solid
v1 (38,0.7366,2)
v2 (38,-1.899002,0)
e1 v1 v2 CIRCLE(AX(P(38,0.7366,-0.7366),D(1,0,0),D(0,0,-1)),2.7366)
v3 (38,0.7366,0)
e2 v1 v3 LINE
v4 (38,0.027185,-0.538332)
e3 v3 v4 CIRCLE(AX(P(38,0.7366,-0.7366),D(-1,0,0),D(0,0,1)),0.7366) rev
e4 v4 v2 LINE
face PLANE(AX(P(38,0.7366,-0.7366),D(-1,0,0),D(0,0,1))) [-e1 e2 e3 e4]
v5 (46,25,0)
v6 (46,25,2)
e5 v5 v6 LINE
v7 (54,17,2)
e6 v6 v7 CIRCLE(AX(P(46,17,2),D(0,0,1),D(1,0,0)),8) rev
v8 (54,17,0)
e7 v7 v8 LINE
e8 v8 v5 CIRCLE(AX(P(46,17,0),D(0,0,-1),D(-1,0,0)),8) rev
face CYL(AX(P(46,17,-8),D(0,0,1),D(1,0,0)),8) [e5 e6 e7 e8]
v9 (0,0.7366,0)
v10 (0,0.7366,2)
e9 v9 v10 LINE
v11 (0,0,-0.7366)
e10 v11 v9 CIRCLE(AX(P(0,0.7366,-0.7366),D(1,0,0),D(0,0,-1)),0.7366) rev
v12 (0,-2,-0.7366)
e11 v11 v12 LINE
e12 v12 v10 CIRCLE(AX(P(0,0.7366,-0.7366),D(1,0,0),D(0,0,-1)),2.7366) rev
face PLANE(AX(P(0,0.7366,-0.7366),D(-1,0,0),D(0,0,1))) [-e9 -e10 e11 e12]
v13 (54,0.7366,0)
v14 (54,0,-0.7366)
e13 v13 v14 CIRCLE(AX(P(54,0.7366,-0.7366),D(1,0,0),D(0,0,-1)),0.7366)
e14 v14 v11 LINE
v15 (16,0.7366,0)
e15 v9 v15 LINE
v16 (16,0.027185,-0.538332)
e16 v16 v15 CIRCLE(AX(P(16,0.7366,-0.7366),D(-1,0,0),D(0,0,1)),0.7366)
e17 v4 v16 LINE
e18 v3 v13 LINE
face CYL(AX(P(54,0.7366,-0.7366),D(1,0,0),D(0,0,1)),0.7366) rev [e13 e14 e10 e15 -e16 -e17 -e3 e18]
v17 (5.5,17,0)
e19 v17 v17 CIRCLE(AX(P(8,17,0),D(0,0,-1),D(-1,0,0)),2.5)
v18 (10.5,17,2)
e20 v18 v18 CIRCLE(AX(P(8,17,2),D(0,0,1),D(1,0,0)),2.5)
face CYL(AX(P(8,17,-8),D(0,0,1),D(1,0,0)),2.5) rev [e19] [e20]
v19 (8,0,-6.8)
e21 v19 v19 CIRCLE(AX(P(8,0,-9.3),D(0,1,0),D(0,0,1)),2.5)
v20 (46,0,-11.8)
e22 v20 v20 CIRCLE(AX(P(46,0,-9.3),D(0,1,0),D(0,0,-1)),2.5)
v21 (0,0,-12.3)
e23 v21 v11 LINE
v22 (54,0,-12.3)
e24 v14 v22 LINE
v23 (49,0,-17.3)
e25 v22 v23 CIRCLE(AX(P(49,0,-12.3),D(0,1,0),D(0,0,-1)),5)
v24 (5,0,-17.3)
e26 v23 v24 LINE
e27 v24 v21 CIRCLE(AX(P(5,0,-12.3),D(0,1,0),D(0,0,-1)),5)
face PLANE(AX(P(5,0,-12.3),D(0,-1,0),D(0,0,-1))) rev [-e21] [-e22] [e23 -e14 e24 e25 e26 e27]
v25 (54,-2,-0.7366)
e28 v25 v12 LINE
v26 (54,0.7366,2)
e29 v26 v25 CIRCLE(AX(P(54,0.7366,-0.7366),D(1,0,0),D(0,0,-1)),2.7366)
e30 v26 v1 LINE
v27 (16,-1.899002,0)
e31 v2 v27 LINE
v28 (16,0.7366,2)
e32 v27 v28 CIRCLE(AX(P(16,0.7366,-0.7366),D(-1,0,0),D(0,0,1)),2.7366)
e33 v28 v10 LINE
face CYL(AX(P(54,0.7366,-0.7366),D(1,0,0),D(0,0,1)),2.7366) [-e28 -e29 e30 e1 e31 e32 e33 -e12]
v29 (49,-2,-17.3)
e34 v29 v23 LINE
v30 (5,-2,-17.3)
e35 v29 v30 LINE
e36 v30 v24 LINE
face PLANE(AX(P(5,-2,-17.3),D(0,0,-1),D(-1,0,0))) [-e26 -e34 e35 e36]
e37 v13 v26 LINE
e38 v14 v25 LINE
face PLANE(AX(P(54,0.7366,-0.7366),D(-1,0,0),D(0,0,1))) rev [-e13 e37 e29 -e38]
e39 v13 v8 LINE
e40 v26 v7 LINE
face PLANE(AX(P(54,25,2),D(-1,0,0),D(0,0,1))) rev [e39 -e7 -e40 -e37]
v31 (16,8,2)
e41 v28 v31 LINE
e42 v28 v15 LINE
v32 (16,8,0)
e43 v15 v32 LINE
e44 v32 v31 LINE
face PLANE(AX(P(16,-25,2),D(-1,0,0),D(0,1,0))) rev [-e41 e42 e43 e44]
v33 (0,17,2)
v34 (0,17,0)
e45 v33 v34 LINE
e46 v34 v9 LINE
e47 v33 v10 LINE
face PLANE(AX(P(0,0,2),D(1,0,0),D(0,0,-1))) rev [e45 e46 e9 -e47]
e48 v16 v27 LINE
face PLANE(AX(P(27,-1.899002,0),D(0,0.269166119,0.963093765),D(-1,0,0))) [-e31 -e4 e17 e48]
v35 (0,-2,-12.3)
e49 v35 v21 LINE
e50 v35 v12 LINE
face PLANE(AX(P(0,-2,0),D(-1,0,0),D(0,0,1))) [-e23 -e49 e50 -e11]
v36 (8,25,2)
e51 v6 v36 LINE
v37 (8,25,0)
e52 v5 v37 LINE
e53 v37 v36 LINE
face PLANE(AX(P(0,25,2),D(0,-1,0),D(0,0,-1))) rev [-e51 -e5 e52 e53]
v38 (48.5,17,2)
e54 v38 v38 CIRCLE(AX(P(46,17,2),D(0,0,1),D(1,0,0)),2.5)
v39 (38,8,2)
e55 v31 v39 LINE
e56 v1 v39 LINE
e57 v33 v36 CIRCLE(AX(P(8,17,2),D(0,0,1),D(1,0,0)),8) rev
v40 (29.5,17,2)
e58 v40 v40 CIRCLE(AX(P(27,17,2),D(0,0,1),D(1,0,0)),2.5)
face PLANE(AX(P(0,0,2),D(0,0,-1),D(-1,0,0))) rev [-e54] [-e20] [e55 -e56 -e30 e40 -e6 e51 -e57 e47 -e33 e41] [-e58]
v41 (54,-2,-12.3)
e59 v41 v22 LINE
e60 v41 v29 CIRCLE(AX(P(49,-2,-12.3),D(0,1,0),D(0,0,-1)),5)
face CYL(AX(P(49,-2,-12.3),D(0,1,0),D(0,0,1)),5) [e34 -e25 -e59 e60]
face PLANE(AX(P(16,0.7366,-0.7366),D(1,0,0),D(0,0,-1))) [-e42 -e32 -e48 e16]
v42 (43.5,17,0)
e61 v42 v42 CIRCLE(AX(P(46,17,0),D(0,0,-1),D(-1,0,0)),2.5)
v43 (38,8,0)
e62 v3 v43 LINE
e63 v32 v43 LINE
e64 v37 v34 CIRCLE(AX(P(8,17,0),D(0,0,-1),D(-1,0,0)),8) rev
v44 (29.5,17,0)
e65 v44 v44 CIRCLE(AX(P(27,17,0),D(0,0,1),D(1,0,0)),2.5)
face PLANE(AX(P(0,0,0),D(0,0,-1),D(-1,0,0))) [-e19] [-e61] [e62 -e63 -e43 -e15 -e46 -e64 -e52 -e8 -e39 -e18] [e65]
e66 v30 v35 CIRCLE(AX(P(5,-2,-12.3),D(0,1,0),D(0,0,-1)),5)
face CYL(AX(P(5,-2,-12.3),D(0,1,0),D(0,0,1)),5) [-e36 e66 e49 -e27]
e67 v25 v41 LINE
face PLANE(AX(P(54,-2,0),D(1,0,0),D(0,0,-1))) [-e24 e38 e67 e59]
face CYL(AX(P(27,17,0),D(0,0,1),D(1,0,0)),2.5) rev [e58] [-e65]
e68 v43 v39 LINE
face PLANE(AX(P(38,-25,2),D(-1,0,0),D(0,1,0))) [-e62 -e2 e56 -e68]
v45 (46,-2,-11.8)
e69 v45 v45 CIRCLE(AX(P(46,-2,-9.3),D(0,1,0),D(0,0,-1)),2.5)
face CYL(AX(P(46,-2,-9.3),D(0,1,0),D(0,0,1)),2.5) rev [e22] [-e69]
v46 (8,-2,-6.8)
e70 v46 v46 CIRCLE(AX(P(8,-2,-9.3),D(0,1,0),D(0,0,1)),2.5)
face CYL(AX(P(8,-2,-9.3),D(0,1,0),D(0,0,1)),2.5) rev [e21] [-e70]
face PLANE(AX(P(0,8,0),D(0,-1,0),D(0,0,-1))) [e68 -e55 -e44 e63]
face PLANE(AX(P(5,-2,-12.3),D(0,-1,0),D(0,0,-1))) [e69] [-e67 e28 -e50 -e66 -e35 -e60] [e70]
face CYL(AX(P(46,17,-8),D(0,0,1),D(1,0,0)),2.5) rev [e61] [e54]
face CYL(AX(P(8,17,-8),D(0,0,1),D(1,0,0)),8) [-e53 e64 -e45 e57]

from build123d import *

# Parameters (mm, degrees)
SKETCH1_R                    = 2.5
BASE_FLANGE1_DEPTH           = 2
EDGE_FLANGE1_STRIP_W         = 9.4732
EDGE_FLANGE1_STRIP_H         = 2
EDGE_FLANGE1_STRIP_CUT_DEPTH = 54
EDGE_FLANGE1_DEPTH           = 54
CUT_EXTRUDE1_START           = 16
CUT_EXTRUDE1_DEPTH           = 22
SKETCH10_R                   = 2.5
CUT_EXTRUDE2_DEPTH           = 10
SKETCH11_W                   = 22
SKETCH11_H                   = 17
SKETCH11_R                   = 2.5
BOSS_EXTRUDE1_DEPTH          = 2


# Read off the part's stored shape, not the designer's step: Cut-Extrude1
# Sheet-metal steps are written as plain solids
with BuildPart() as part:
    # Sketch1 → Base-Flange1 (new body)
    with BuildSketch(Plane(origin=(0, 0, 0), x_dir=(1, 0, 0), z_dir=(0, 1, 0))):
        with BuildLine():
            Line((0, 0), (54, 0))
            Line((54, 0), (54, 12.3))
            ThreePointArc((54, 12.3), (52.535533906, 15.835533906), (49, 17.3))
            Line((49, 17.3), (5, 17.3))
            ThreePointArc((5, 17.3), (1.464466094, 15.835533906), (0, 12.3))
            Line((0, 12.3), (0, 0))
        make_face()
        with Locations(Location((8, 9.3, 0), (0, 0, 270))):
            Circle(SKETCH1_R, mode=Mode.SUBTRACT)
        with Locations(Location((46, 9.3, 0), (0, 0, 90))):
            Circle(SKETCH1_R, mode=Mode.SUBTRACT)
    extrude(amount=-BASE_FLANGE1_DEPTH)

    # Edge-Flange1 strip (across the edge) → Edge-Flange1 strip cut (cut)
    with BuildSketch(Plane(origin=(0, 0, 0), x_dir=(0, 0, -1), z_dir=(1, 0, 0))):
        with Locations((-4, -1)):
            Rectangle(EDGE_FLANGE1_STRIP_W, EDGE_FLANGE1_STRIP_H)
    extrude(amount=EDGE_FLANGE1_STRIP_CUT_DEPTH, mode=Mode.SUBTRACT)

    # Edge-Flange1 section (across the edge) → Edge-Flange1 (add)
    with BuildSketch(Plane(origin=(0, 0, 0), x_dir=(0, 0, -1), z_dir=(1, 0, 0))):
        with BuildLine():
            Line((-2, 0.7366), (-2, 25))
            Line((-2, 25), (0, 25))
            Line((0, 25), (0, 0.7366))
            ThreePointArc((0, 0.7366), (0.215745145, 0.215745145), (0.7366, 0))
            Line((0.7366, 0), (0.7366, -2))
            ThreePointArc((0.7366, -2), (-1.198468417, -1.198468417), (-2, 0.7366))
        make_face()
    extrude(amount=EDGE_FLANGE1_DEPTH)

    # Cut-Extrude1 outline → Cut-Extrude1 (cut)
    with BuildSketch(Plane.YZ.offset(CUT_EXTRUDE1_START)):
        with BuildLine():
            Line((-1.899002398, 0), (0.027185133, -0.538332237))
            ThreePointArc((0.027185133, -0.538332237), (0.291327316, -0.149819123), (0.7366, 0))
            Line((0.7366, 0), (25, 0))
            Line((25, 0), (25, 2))
            Line((25, 2), (0.7366, 2))
            ThreePointArc((0.7366, 2), (-0.917667209, 1.443395312), (-1.899002398, 0))
        make_face()
    extrude(amount=CUT_EXTRUDE1_DEPTH, mode=Mode.SUBTRACT)

    # Sketch10 → Cut-Extrude2 (cut)
    with BuildSketch(Plane.XY.offset(2)):
        with BuildLine():
            ThreePointArc((46, 25), (51.656854249, 22.656854249), (54, 17))
            Line((54, 17), (54, 25))
            Line((54, 25), (46, 25))
        make_face()
        with Locations((46, 17)):
            Circle(SKETCH10_R)
        with Locations((8, 17)):
            Circle(SKETCH10_R)
        with BuildLine():
            ThreePointArc((0, 17), (2.343145728, 22.656854227), (7.999999938, 25))
            Line((7.999999938, 25), (0, 25))
            Line((0, 25), (0, 17))
        make_face()
    extrude(amount=-CUT_EXTRUDE2_DEPTH, mode=Mode.SUBTRACT)

    # Sketch11 → Boss-Extrude1 (add)
    with BuildSketch(Plane.XY.offset(2)):
        with Locations((27, 16.5)):
            Rectangle(SKETCH11_W, SKETCH11_H)
        with Locations((27, 17)):
            Circle(SKETCH11_R, mode=Mode.SUBTRACT)
    extrude(amount=-BOSS_EXTRUDE1_DEPTH)


solid = part.part
